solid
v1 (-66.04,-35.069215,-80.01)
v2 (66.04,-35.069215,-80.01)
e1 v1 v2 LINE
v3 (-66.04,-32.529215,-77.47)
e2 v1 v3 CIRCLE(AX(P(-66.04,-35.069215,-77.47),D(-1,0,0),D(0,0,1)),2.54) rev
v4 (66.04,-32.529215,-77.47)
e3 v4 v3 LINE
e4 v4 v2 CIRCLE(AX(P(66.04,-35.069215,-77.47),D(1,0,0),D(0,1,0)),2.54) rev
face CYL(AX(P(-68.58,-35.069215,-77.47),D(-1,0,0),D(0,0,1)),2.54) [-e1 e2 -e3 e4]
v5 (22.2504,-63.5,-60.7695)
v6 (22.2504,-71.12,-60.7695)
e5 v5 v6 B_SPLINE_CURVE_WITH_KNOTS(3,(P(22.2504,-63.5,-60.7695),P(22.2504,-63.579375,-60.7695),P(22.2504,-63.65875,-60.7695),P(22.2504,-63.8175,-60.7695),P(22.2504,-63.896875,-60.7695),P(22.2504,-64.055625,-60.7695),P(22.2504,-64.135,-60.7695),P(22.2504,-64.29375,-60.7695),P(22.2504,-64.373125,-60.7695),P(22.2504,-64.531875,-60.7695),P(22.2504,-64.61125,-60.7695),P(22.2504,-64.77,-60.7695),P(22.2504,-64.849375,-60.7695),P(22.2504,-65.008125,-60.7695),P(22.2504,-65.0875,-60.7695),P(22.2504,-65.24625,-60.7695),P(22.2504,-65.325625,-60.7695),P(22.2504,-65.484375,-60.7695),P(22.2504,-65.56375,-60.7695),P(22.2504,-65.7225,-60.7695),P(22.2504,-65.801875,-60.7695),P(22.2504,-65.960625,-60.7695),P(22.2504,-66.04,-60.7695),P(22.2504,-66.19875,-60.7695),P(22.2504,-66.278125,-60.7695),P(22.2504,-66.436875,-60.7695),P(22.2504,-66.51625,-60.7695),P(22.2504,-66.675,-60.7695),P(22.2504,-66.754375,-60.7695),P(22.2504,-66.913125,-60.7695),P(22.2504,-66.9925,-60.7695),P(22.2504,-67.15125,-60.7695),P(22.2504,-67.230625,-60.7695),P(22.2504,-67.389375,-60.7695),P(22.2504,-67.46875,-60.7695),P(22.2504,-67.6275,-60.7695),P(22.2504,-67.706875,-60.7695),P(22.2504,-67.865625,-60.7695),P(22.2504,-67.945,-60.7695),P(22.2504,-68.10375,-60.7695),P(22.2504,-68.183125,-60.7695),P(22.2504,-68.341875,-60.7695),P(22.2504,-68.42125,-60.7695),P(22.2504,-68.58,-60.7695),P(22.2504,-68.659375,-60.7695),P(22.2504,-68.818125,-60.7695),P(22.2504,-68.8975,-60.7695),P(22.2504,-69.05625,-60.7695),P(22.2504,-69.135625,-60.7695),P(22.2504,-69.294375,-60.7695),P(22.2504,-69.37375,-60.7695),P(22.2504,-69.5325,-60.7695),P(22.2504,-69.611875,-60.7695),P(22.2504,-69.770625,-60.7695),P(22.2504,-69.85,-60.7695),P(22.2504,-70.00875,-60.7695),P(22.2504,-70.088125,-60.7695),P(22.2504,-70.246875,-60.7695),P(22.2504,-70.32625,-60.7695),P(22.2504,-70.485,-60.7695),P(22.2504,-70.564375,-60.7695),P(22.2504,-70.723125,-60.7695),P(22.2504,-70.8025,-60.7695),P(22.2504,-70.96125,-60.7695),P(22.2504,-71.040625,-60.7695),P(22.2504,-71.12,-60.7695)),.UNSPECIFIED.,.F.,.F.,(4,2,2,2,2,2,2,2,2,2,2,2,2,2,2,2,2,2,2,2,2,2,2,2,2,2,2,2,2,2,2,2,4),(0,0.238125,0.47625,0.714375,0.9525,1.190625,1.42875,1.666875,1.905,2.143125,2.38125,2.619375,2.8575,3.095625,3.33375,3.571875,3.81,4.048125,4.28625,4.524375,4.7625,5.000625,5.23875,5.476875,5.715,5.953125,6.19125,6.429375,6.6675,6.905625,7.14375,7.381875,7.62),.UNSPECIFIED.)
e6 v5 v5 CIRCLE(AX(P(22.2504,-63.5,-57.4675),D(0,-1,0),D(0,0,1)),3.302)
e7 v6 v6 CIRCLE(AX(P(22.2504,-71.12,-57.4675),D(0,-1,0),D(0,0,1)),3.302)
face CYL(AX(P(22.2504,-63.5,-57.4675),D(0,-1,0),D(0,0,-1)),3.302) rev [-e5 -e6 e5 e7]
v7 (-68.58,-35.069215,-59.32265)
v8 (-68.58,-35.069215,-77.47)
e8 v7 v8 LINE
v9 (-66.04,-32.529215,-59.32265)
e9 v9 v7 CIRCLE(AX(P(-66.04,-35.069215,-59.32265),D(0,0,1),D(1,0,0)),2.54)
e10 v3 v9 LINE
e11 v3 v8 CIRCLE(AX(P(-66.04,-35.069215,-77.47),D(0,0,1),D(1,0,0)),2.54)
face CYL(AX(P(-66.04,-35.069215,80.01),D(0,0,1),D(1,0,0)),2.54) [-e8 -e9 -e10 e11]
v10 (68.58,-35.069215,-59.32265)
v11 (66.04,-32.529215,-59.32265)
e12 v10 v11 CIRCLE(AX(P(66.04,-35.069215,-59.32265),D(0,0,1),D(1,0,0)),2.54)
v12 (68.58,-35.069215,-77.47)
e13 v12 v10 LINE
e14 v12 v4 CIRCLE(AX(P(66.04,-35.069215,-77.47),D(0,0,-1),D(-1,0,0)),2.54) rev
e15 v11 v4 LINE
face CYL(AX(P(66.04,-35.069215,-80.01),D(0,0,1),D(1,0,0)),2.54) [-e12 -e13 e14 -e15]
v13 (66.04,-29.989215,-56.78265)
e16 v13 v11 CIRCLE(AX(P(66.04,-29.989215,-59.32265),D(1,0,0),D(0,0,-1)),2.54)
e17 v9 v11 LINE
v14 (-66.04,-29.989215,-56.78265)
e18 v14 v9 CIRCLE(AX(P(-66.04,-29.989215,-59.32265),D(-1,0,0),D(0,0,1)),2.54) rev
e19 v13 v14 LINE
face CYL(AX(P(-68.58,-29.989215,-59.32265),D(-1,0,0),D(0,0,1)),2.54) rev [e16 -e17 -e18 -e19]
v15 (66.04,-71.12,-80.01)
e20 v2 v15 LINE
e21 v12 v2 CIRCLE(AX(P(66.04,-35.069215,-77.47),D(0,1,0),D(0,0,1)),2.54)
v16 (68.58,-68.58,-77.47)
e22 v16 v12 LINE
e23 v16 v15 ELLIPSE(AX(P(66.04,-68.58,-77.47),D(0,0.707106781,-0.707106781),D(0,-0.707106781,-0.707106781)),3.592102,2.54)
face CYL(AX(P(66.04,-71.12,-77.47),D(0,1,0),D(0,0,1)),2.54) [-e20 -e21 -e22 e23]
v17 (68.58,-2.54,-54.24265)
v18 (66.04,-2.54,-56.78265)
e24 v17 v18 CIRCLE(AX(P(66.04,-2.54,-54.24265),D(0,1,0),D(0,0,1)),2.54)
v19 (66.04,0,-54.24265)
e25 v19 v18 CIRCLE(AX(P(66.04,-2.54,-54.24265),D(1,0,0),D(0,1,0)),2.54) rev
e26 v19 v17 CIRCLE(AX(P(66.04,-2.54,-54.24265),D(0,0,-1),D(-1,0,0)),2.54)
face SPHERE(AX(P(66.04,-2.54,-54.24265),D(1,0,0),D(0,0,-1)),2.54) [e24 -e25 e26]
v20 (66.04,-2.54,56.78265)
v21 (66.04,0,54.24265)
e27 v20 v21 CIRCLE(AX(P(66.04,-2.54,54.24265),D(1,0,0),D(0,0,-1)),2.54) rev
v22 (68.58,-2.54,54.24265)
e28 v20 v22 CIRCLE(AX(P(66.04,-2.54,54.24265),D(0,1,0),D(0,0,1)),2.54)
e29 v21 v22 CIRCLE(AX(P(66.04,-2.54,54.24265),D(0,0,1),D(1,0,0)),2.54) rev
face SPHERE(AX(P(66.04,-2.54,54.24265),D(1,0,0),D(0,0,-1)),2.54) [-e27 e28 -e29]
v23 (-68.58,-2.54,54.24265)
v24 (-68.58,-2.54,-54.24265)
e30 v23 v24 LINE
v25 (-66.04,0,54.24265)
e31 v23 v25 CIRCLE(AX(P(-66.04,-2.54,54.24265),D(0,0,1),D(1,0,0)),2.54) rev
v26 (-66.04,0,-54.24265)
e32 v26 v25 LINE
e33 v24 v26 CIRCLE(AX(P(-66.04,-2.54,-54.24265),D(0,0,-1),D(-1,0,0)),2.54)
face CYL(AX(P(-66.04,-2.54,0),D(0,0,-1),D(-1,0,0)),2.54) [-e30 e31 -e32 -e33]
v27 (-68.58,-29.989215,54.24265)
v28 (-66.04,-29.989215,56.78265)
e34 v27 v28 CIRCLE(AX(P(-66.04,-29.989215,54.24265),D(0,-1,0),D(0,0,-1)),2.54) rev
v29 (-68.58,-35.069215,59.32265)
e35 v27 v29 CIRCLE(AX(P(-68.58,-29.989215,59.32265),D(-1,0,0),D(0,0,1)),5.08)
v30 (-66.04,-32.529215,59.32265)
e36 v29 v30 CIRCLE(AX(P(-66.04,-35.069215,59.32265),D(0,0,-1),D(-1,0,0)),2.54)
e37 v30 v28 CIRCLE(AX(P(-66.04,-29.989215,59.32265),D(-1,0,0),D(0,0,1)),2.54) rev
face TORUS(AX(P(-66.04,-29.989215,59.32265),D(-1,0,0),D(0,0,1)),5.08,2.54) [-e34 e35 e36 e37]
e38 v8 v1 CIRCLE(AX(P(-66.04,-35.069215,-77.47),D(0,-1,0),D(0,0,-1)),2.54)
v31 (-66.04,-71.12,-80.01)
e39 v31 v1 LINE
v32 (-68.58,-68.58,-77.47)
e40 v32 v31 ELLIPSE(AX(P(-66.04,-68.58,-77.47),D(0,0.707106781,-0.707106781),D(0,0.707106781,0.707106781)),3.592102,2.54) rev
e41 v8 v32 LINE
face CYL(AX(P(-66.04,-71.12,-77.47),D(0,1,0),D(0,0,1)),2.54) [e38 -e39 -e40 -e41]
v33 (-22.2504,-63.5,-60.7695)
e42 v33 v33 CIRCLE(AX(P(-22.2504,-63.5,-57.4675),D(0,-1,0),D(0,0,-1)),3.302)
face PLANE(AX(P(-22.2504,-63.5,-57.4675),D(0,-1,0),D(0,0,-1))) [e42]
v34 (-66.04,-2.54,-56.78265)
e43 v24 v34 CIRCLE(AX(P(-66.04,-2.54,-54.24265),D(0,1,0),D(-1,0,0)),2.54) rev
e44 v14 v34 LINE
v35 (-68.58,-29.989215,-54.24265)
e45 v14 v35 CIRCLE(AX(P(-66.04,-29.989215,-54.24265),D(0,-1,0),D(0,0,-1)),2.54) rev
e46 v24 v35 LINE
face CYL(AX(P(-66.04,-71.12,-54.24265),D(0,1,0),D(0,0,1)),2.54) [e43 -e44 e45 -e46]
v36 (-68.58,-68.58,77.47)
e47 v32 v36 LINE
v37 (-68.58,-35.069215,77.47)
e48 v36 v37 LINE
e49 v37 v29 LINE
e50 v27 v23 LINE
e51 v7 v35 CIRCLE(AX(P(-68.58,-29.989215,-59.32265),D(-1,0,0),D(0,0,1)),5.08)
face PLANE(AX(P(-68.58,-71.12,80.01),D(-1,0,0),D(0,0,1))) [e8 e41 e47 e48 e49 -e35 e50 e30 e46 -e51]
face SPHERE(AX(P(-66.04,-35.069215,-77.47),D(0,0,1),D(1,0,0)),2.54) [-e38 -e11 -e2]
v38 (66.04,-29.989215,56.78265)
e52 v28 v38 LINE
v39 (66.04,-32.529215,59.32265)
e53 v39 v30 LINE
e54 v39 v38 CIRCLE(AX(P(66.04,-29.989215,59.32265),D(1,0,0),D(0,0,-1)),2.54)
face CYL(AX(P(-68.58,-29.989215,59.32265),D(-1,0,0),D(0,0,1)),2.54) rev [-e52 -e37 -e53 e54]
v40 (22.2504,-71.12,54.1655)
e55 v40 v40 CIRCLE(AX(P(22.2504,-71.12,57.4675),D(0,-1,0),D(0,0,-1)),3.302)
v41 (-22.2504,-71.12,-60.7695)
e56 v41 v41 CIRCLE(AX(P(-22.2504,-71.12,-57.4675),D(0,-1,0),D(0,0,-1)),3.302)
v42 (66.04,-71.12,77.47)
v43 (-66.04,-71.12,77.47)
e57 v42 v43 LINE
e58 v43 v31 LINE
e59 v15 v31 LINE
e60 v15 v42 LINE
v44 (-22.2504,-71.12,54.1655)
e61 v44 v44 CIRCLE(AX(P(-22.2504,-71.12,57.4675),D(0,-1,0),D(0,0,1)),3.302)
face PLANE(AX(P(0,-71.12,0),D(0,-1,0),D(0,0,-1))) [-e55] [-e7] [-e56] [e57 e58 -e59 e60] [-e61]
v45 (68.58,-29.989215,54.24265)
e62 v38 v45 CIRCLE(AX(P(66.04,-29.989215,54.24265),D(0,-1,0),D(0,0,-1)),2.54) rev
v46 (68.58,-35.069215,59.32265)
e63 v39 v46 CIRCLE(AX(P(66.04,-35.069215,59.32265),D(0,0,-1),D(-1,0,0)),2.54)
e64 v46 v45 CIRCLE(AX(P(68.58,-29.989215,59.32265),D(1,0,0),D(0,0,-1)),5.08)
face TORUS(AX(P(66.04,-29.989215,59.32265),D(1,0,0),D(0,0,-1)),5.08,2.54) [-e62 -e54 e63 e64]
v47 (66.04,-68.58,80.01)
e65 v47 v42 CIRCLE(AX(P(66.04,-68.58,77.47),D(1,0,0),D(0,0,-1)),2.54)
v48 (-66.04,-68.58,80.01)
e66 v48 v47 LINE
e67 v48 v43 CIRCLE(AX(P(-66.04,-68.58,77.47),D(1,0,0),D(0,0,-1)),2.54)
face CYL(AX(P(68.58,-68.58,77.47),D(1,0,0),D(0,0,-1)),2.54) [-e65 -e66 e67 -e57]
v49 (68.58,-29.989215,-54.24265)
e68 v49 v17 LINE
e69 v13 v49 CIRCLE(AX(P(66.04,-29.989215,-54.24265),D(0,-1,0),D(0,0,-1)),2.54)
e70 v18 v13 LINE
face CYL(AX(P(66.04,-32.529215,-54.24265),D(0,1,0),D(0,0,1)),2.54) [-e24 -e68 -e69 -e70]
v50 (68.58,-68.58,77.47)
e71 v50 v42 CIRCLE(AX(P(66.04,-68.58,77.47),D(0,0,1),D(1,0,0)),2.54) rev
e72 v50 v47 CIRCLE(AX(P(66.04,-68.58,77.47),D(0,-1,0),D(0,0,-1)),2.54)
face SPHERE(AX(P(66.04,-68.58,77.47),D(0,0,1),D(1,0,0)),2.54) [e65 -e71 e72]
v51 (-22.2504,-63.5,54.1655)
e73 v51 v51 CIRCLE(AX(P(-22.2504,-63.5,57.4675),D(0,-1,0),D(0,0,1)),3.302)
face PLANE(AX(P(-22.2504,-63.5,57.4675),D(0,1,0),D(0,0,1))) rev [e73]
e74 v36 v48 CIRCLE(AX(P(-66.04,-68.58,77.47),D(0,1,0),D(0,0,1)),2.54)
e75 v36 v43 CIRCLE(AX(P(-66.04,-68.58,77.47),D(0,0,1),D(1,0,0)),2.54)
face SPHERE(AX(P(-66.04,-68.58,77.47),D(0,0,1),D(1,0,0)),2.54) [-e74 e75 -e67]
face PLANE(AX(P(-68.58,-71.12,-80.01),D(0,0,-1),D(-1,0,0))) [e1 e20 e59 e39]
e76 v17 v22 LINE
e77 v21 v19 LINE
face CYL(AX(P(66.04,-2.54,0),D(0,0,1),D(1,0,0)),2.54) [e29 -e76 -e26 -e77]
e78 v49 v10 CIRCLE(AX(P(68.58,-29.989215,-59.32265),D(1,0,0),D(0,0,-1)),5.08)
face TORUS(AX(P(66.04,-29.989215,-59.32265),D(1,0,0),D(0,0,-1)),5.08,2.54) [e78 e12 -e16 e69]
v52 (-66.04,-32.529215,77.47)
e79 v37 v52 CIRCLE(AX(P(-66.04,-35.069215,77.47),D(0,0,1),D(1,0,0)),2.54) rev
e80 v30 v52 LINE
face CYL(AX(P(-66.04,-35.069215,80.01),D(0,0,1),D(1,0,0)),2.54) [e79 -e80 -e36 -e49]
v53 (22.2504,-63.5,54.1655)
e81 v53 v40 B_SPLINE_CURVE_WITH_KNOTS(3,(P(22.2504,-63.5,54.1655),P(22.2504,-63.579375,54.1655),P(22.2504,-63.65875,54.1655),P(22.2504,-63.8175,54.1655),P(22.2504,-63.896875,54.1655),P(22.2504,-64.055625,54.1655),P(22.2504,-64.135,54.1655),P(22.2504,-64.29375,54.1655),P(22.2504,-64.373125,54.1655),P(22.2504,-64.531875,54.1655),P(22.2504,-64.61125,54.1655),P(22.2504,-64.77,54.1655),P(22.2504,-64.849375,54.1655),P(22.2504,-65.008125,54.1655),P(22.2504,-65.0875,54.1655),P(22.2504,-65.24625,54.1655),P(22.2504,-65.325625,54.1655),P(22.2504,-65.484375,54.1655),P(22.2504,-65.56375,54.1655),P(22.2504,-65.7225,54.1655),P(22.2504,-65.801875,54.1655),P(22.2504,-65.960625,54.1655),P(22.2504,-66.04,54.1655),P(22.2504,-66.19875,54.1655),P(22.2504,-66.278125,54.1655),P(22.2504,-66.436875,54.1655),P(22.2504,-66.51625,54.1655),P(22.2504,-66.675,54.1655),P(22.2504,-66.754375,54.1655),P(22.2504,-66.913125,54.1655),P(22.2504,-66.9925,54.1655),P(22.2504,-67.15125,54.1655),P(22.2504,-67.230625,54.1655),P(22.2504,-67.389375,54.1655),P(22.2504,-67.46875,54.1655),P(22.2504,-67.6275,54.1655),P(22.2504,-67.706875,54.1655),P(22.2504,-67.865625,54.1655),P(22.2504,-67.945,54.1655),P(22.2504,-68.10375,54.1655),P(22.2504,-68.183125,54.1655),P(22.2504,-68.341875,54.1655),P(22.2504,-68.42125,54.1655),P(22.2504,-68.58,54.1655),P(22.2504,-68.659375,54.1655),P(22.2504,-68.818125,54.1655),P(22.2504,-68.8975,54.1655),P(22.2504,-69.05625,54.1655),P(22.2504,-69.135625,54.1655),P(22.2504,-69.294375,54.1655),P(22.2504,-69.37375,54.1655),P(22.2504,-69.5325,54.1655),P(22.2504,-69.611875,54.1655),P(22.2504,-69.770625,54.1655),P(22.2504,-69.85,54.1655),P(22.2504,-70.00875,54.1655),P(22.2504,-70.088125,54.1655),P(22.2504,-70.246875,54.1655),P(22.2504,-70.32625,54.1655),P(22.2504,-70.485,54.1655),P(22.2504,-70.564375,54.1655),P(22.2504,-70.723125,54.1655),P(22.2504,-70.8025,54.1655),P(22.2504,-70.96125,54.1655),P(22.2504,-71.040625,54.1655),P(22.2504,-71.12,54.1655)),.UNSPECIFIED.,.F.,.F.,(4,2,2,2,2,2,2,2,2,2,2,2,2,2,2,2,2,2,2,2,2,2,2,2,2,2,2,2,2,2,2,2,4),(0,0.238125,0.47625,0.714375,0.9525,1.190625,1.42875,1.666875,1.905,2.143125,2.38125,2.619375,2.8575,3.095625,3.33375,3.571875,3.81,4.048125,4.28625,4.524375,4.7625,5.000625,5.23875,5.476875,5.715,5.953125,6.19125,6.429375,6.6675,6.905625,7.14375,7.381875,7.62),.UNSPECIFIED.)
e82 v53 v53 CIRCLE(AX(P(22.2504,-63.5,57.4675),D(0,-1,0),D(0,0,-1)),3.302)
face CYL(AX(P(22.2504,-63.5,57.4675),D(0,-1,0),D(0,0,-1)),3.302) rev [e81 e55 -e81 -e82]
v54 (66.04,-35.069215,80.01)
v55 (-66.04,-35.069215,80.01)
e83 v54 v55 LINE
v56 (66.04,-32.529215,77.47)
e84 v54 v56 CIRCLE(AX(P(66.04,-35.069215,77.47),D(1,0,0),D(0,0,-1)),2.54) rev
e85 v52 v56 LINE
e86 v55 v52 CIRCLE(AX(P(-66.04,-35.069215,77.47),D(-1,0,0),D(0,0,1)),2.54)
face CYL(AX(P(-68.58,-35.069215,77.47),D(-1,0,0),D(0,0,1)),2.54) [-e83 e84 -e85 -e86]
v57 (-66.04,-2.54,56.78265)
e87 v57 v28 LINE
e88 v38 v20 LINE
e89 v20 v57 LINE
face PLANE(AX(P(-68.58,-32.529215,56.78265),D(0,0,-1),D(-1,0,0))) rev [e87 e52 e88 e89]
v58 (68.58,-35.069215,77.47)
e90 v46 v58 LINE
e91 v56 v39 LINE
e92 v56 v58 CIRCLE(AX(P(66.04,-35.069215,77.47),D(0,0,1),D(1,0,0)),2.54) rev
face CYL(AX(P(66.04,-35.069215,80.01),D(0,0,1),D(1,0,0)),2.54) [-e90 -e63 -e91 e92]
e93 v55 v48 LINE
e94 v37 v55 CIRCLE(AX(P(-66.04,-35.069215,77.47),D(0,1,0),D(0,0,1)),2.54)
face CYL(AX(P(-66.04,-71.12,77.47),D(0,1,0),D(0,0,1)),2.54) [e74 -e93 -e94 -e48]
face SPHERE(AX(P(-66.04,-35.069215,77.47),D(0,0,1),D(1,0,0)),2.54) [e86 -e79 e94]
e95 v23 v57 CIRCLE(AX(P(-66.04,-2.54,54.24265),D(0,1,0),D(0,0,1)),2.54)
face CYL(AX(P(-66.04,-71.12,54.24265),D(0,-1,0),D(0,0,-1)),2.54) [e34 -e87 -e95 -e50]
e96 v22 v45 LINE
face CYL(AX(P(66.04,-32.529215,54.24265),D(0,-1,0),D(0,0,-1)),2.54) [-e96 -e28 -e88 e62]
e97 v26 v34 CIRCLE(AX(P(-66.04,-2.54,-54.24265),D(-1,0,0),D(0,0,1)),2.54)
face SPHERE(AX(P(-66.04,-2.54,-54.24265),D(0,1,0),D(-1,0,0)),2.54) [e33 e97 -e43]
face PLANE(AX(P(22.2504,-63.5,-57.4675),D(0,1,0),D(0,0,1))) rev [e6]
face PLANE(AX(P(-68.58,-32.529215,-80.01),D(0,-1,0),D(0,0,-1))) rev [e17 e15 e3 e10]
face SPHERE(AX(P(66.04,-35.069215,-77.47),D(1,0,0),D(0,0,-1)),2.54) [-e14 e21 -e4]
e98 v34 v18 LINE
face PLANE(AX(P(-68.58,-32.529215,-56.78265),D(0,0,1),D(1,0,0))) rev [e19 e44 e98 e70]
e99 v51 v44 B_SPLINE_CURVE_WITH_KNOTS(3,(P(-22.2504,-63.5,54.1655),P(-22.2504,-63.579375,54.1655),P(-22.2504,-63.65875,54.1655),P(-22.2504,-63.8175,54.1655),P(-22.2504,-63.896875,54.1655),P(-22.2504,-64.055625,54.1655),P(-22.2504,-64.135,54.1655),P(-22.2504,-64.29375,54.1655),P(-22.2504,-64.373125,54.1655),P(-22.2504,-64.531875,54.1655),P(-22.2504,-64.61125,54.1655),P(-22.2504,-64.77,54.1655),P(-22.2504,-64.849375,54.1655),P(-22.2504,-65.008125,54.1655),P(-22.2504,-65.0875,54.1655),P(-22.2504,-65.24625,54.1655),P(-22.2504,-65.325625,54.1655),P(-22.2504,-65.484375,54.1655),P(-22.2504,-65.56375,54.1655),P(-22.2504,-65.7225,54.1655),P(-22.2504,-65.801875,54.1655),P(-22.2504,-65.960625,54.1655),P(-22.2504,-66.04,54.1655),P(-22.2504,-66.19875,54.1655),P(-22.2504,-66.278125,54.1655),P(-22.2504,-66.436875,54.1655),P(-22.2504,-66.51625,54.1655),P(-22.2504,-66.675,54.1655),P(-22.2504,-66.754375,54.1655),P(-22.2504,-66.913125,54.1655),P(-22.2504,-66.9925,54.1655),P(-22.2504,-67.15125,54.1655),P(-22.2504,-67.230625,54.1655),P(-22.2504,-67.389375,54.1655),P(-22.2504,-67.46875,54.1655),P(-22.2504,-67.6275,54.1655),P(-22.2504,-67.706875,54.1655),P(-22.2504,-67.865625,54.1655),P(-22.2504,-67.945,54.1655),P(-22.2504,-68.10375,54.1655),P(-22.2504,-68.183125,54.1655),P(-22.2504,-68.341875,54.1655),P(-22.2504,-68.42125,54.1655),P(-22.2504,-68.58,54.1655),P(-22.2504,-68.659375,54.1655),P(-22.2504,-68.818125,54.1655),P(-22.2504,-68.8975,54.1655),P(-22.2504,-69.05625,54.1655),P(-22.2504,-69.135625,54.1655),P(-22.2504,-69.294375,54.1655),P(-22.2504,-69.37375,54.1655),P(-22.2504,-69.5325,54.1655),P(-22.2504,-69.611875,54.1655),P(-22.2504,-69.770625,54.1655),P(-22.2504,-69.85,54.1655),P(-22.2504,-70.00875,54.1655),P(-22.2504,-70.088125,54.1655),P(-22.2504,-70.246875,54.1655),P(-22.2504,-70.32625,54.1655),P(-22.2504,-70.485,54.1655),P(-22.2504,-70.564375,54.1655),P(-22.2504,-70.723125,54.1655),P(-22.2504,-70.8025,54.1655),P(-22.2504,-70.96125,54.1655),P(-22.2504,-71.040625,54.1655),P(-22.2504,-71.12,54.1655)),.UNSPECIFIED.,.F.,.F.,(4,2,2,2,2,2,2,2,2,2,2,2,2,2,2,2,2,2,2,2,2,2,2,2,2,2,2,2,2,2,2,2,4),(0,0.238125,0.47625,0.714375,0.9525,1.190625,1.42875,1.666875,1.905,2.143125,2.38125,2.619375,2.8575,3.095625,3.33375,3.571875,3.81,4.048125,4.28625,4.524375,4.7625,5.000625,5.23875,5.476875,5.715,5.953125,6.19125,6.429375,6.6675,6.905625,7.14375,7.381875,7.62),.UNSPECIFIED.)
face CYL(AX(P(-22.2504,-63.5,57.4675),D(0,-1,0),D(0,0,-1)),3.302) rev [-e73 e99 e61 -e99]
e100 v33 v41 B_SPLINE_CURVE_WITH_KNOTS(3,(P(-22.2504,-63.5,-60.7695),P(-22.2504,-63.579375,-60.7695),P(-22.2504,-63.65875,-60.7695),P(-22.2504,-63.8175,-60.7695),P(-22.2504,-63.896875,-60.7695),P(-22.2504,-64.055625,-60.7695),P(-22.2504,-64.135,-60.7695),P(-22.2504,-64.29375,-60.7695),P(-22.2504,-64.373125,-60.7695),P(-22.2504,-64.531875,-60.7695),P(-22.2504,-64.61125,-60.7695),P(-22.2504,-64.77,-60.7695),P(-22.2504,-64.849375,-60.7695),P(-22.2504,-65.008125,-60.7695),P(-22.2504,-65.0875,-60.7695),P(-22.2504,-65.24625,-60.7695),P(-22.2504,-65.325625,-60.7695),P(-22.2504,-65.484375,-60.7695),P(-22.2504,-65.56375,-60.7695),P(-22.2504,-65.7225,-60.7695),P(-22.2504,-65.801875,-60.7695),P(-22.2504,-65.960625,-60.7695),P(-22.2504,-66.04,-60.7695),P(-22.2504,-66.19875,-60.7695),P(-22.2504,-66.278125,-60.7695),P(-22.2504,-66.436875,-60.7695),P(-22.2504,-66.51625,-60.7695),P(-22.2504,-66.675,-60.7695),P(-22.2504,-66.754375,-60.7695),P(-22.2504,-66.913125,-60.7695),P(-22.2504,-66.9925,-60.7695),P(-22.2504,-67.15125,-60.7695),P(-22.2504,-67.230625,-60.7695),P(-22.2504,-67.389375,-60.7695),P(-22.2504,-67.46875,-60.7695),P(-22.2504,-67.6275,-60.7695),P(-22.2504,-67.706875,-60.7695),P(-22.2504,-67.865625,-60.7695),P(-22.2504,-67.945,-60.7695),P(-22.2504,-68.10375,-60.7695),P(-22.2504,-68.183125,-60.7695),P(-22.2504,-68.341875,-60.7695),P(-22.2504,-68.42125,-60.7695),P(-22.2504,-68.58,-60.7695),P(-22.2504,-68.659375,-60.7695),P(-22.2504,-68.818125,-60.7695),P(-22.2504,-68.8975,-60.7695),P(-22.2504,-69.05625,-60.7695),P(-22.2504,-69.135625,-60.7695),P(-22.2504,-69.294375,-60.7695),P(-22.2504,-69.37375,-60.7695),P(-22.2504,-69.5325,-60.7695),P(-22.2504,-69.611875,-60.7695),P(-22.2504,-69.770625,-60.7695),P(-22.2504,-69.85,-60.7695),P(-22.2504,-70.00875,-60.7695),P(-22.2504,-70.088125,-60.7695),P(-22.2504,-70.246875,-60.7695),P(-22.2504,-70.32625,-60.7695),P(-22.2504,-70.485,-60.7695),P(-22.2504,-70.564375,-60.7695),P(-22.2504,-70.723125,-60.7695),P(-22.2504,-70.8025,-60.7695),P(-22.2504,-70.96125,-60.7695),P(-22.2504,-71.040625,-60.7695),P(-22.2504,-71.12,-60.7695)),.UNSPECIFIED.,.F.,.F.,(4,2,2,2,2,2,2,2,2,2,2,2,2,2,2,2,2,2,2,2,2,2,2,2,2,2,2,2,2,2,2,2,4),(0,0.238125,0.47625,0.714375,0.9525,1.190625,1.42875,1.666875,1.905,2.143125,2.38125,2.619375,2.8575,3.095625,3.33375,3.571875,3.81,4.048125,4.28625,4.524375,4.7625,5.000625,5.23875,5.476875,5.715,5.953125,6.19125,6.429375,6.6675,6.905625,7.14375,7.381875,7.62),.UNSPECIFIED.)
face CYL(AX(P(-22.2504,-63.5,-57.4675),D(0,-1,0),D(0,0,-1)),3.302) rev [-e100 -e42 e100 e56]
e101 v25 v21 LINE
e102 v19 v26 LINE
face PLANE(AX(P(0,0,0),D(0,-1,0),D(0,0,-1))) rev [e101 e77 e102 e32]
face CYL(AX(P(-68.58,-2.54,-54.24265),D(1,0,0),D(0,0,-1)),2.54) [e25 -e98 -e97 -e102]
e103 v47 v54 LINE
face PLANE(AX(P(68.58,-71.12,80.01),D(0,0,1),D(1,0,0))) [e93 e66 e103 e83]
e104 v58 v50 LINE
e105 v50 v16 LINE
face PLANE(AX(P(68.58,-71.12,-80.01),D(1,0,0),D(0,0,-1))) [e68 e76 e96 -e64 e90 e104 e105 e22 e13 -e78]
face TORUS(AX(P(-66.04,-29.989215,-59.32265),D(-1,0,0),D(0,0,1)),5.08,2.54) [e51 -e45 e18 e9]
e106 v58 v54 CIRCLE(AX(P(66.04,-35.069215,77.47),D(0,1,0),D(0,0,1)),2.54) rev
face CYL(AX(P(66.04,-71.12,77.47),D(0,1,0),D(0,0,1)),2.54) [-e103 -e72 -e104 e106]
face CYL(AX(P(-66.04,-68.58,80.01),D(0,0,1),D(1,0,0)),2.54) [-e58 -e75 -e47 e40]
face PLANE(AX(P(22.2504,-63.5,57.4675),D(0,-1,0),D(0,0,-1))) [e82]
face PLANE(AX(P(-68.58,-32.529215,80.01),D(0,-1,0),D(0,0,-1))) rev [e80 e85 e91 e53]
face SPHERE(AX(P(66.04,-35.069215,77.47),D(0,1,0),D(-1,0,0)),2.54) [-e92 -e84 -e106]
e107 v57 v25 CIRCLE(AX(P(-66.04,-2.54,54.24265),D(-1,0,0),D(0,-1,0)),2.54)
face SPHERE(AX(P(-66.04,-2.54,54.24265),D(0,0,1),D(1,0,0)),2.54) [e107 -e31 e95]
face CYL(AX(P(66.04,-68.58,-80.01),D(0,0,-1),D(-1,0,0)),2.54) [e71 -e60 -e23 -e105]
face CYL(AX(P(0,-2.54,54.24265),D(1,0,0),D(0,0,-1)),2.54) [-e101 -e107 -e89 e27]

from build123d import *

# Parameters (mm, degrees)
SKETCH1_W               = 137.16
SKETCH1_H               = 160.02
BOSS_EXTRUDE1_DEPTH     = 71.12
CUT_EXTRUDE1_DEPTH      = 174.99
CUT_EXTRUDE1_DEPTH_BACK = 174.99
SKETCH2_W               = 23.227349815
SKETCH2_H               = 32.529214904
FILLET1_R               = 2.54
FILLET2_R               = 2.54
SKETCH3_R               = 3.302
CUT_EXTRUDE2_DEPTH      = 7.62


with BuildPart() as part:
    # Sketch1 → Boss-Extrude1 (new body)
    with BuildSketch(Plane(origin=(0, 0, 0), x_dir=(1, 0, 0), z_dir=(0, 1, 0))):
        Rectangle(SKETCH1_W, SKETCH1_H)
    extrude(amount=-BOSS_EXTRUDE1_DEPTH)

    # Sketch2 → Cut-Extrude1 (cut, two sides: drawn at the far end of the back side and taken through both)
    with BuildSketch(Plane(origin=(68.58, 0, 0), x_dir=(0, 0, -1), z_dir=(1, 0, 0)).offset(-CUT_EXTRUDE1_DEPTH_BACK)):
        with Locations((-68.396325093, -16.264607452)):
            Rectangle(SKETCH2_W, SKETCH2_H)
        with Locations((68.396325093, -16.264607452)):
            Rectangle(SKETCH2_W, SKETCH2_H)
    extrude(amount=CUT_EXTRUDE1_DEPTH + CUT_EXTRUDE1_DEPTH_BACK, mode=Mode.SUBTRACT)

    # Fillet1
    fillet1_edges = [part.edges().sort_by_distance(p)[0] for p in [
        (68.58, 0, 0),
        (-68.58, 0, 0),
        (0, -71.12, 80.01),
        (68.58, -32.529214904, 68.396325092),
        (68.58, -16.264607452, 56.782650185),
        (0, -32.529214904, 80.01),
        (-68.58, -16.264607452, 56.782650185),
        (0, 0, 56.782650185),
        (-68.58, -32.529214904, 68.396325092),
        (0, -32.529214904, 56.782650185),
        (68.58, -32.529214904, -68.396325092),
        (68.58, -16.264607452, -56.782650185),
        (-68.58, -16.264607452, -56.782650185),
        (0, -32.529214904, -56.782650185),
        (0, 0, -56.782650185),
        (-68.58, -32.529214904, -68.396325092),
        (0, -32.529214904, -80.01),
        (68.58, -71.12, 0),
        (68.58, -51.824607452, 80.01),
        (-68.58, -51.824607452, 80.01),
        (68.58, -51.824607452, -80.01),
    ]]
    fillet(fillet1_edges, radius=FILLET1_R)

    # Fillet2
    # the kernel refuses this fillet: 2.54 mm, written as the material it takes off along each edge
    with BuildSketch(Plane(origin=(-66.04, -68.58, 77.47), x_dir=(-1, 0, 0), z_dir=(0, -1, 0))) as fillet2_piece_1_section:
        Polygon((0, 0), (FILLET2_R, 0), (FILLET2_R, -FILLET2_R), (0, -FILLET2_R), align=None)
    fillet2_piece_1 = extrude(amount=FILLET2_R, mode=Mode.PRIVATE)
    fillet2_piece_1 = fillet2_piece_1 - Plane(origin=(-66.04, -68.58, 77.47), x_dir=(0.7071067811865475, 0, -0.7071067811865476), z_dir=(0, -1, 0)) * Sphere(FILLET2_R, mode=Mode.PRIVATE)
    add(fillet2_piece_1, mode=Mode.SUBTRACT)
    with BuildSketch(Plane(origin=(-66.04, -35.069214904, -77.47), x_dir=(-1, 0, 0), z_dir=(0, 0, -1))) as fillet2_piece_2_section:
        Polygon((0, 0), (FILLET2_R, 0), (FILLET2_R, FILLET2_R), (0, FILLET2_R), align=None)
    fillet2_piece_2 = extrude(amount=FILLET2_R, mode=Mode.PRIVATE)
    fillet2_piece_2 = fillet2_piece_2 - Plane(origin=(-66.04, -35.069214904, -77.47), x_dir=(0.7071067811865475, -0.7071067811865475, 0), z_dir=(0, 0, -1)) * Sphere(FILLET2_R, mode=Mode.PRIVATE)
    add(fillet2_piece_2, mode=Mode.SUBTRACT)
    with BuildSketch(Plane(origin=(-68.58, -71.12, 77.47), x_dir=(1, 0, 0), z_dir=(0, 0, -1))) as fillet2_piece_3:
        with BuildLine():
            CenterArc((FILLET2_R, -FILLET2_R), FILLET2_R, 90, 90)
            Line((0, -FILLET2_R), (0, 0))
            Line((0, 0), (FILLET2_R, 0))
        make_face()
    extrude(amount=163.83, mode=Mode.SUBTRACT)
    with BuildSketch(Plane(origin=(-68.58, -35.069214904, -80.01), x_dir=(1, 0, 0), z_dir=(0, -1, 0))) as fillet2_piece_4:
        with BuildLine():
            CenterArc((FILLET2_R, FILLET2_R), FILLET2_R, 180, 90)
            Line((0, FILLET2_R), (0, 0))
            Line((0, 0), (FILLET2_R, 0))
        make_face()
    extrude(amount=42.400785096, mode=Mode.SUBTRACT)

    # Sketch3 → Cut-Extrude2 (cut)
    with BuildSketch(Plane.XZ.offset(71.12)):
        with Locations(Location((-22.2504, -57.4675, 0), (0, 0, 270))):
            Circle(SKETCH3_R)
        with Locations(Location((-22.2504, 57.4675, 0), (0, 0, 270))):
            Circle(SKETCH3_R)
        with Locations(Location((22.2504, 57.4675, 0), (0, 0, 270))):
            Circle(SKETCH3_R)
        with Locations(Location((22.2504, -57.4675, 0), (0, 0, 270))):
            Circle(SKETCH3_R)
    extrude(amount=-CUT_EXTRUDE2_DEPTH, mode=Mode.SUBTRACT)


solid = part.part
